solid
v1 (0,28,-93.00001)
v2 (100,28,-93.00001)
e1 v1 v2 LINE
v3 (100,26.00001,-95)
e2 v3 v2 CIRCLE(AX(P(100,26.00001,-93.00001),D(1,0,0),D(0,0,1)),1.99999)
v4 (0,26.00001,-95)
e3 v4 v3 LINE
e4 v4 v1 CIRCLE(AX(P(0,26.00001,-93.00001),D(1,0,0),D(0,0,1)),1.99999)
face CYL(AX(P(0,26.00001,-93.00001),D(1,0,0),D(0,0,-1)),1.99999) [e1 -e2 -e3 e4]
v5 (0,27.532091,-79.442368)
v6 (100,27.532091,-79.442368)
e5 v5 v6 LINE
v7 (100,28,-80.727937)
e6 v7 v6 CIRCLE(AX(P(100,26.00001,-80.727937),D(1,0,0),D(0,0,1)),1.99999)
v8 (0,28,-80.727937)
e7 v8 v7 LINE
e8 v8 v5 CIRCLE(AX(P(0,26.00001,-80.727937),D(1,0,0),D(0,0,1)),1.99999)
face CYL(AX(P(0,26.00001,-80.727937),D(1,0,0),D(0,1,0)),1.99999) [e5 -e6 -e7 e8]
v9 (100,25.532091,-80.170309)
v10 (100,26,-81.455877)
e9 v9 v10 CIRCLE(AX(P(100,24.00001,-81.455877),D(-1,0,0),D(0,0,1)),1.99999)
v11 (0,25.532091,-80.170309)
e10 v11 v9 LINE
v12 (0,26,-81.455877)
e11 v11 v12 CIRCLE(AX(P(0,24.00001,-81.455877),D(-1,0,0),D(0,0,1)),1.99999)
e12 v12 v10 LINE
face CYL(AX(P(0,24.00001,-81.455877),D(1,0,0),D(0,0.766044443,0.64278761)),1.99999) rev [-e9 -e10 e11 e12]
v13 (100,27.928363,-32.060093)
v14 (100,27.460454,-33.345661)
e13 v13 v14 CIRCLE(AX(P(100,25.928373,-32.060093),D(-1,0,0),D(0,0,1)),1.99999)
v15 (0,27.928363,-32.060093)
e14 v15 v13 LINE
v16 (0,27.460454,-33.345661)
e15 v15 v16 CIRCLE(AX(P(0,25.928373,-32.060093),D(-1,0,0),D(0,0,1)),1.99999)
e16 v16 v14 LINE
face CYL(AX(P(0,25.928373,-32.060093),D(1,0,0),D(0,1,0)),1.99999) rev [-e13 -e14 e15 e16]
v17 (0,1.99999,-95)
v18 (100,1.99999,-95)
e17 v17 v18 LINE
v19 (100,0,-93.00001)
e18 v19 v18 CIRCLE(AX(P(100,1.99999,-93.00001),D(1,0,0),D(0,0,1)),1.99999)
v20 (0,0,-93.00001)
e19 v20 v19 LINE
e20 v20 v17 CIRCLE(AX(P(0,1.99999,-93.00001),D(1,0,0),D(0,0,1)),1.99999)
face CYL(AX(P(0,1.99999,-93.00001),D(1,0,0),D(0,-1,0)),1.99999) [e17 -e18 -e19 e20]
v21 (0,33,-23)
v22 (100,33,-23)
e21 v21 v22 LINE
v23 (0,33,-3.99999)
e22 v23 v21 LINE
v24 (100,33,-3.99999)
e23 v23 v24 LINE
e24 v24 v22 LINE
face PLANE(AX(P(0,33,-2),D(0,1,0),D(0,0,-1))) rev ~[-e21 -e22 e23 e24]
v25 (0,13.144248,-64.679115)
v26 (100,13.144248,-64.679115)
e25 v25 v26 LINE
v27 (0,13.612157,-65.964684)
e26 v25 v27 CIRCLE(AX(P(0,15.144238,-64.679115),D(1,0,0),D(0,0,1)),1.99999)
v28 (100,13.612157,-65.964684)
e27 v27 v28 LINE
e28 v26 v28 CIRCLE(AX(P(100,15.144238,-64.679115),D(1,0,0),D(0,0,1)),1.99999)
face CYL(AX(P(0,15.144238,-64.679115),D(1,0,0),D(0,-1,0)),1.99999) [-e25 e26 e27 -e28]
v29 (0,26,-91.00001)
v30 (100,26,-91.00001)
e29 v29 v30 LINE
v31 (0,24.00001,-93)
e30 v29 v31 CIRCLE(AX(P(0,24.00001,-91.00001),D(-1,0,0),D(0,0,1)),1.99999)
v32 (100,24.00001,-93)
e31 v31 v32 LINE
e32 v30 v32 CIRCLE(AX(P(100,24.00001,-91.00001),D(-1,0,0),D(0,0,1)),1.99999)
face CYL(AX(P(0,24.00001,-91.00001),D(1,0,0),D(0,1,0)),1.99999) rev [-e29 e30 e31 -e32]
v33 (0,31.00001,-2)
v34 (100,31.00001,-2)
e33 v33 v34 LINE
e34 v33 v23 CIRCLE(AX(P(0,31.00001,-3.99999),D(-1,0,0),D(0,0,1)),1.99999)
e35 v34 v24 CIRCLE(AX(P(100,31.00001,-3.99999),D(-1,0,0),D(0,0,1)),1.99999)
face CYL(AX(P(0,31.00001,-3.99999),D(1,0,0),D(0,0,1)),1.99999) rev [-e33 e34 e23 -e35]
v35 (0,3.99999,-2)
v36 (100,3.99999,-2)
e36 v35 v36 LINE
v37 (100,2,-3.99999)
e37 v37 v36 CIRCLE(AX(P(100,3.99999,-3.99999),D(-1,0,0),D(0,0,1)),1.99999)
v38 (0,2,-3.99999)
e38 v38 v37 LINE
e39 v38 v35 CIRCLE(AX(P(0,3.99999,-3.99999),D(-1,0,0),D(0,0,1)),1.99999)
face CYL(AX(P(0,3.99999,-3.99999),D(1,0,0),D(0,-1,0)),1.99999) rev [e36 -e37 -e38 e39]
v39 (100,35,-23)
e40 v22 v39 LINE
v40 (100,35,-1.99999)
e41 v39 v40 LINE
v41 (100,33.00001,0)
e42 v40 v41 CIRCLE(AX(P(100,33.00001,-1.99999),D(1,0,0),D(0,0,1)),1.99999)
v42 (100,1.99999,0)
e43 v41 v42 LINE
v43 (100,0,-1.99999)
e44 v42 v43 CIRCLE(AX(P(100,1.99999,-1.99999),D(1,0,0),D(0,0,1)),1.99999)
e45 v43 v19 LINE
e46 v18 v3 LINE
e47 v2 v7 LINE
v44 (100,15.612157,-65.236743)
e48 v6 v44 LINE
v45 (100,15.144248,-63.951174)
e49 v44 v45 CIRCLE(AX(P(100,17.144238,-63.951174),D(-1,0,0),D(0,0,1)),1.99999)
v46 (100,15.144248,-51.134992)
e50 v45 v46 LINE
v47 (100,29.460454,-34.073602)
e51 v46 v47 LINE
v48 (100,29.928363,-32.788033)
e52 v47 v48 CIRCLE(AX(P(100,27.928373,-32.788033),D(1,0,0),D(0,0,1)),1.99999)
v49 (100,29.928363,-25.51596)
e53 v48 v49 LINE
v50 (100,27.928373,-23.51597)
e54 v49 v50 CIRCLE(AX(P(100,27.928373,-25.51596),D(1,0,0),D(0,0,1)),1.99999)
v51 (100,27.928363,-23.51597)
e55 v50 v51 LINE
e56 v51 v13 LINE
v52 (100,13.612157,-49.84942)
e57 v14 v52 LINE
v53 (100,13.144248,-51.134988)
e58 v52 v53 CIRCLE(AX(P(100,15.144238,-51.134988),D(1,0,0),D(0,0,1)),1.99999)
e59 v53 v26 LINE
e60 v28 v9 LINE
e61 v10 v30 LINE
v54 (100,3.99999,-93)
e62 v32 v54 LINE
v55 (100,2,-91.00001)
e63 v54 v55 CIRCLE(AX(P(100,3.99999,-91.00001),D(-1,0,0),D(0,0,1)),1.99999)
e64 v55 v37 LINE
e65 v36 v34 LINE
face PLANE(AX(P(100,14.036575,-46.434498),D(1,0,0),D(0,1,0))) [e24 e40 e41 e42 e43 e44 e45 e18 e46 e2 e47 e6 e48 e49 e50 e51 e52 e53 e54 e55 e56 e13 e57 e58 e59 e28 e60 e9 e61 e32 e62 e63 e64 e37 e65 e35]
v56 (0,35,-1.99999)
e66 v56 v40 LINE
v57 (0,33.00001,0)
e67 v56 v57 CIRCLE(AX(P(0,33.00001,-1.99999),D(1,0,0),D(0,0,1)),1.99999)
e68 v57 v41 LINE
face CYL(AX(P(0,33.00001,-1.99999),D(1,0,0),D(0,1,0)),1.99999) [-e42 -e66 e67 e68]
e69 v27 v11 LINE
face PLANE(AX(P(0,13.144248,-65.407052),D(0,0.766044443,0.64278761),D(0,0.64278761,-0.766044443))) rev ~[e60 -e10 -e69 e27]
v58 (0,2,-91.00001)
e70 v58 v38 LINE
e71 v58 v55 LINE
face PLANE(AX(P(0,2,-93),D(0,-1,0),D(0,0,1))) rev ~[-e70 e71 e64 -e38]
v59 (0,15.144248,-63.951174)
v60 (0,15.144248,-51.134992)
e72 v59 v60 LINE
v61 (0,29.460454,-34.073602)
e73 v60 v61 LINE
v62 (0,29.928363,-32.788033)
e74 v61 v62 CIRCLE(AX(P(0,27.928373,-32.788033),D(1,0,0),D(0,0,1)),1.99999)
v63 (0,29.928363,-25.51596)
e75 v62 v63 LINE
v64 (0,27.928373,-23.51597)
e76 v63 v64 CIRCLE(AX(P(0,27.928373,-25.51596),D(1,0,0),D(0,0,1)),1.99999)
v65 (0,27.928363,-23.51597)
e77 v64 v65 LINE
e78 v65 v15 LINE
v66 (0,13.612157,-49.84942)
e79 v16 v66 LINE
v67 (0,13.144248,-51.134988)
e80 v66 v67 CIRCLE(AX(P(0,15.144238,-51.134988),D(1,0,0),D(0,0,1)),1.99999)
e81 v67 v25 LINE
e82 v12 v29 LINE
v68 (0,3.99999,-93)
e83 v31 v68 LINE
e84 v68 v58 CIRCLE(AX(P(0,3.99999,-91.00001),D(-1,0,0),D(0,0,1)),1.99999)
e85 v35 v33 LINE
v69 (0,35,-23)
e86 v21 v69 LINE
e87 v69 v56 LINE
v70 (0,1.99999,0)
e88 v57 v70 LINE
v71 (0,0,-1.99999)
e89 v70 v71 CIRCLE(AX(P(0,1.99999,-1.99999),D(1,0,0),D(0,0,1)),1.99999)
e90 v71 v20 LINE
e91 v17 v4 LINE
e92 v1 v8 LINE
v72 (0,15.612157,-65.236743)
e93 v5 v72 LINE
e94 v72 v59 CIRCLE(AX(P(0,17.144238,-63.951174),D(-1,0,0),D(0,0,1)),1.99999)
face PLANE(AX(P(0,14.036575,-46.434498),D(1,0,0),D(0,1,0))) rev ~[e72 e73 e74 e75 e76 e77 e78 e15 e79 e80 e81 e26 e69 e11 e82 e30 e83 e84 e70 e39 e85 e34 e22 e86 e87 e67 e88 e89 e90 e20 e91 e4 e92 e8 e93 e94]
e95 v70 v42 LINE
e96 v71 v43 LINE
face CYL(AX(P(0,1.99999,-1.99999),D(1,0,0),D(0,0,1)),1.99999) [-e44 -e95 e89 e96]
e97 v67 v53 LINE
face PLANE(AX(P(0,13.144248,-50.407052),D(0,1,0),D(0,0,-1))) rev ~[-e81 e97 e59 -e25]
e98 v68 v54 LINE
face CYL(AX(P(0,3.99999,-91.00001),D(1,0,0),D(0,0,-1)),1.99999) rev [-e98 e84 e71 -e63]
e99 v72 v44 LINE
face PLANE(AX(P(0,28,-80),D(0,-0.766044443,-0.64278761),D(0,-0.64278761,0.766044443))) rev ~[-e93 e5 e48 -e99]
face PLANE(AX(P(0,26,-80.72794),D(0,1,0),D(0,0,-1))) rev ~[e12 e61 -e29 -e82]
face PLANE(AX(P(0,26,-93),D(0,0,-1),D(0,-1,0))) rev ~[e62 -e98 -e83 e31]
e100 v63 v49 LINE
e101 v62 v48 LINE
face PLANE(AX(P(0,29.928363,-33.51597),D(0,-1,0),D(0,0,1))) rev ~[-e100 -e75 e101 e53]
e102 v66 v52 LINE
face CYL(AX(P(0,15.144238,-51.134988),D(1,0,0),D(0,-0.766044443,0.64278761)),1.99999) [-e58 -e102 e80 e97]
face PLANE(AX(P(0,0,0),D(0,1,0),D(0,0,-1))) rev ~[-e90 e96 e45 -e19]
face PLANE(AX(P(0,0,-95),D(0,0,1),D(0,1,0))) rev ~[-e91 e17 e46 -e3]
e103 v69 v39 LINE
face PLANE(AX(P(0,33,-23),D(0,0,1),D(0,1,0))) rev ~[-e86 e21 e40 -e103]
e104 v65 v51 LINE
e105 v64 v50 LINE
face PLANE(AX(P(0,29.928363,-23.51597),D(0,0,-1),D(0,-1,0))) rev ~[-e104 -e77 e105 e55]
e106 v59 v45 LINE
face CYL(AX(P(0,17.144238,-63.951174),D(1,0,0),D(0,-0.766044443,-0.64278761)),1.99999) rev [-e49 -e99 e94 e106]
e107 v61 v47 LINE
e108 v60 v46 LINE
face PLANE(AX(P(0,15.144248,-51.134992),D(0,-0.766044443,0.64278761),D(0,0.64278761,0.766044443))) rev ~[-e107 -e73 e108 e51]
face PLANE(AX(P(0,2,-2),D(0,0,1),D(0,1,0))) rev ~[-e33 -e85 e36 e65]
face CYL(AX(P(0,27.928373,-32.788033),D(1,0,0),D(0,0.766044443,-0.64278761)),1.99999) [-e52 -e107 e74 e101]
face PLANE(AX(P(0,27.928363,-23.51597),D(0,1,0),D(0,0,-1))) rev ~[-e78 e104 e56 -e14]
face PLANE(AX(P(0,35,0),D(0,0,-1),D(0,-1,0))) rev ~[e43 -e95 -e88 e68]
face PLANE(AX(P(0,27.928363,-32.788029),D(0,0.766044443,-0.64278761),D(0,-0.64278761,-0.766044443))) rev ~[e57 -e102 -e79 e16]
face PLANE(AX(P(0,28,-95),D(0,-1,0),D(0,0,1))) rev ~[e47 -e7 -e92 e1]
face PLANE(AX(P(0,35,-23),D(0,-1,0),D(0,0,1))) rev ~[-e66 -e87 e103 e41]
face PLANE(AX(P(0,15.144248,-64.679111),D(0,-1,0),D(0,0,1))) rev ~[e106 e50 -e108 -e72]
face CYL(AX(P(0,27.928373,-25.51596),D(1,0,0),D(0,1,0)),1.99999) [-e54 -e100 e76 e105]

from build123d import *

# Parameters (mm, degrees)
F1_DEPTH = 100
F2_R     = 1.99999


# Not quite as in the source:
# - a fillet or chamfer is up to 0.001 mm smaller than in the source, because OpenCascade refuses the exact size


with BuildPart() as f1:
    # F0 (on Right) → F1 (new body)
    with BuildSketch(Plane.YZ):
        Polygon((33, -23), (35, -23), (35, 0), (0, 0), (0, -95), (28, -95), (28, -80), (15.1442478063, -64.6791111376), (15.1442478063, -51.1349920747), (29.9283628291, -33.5159698829), (29.9283628291, -23.5159698829), (27.9283628291, -23.5159698829), (27.9283628291, -32.7880294144), (13.1442478063, -50.4070516062), (13.1442478063, -65.4070516062), (26, -80.7279404685), (26, -93), (2, -93), (2, -2), (33, -2), align=None)
    extrude(amount=F1_DEPTH)

    # F2 (radius 2 in the source; OpenCascade refuses exactly that, so slightly less here)
    f2_edges = [f1.edges().sort_by_distance(p)[0] for p in [
        (50, 35, 0),
        (50, 0, 0),
        (50, 33, -2),
        (50, 2, -2),
        (50, 0, -95),
        (50, 28, -95),
        (50, 28, -80),
        (50, 2, -93),
        (50, 26, -93),
        (50, 26, -80.72794),
        (50, 27.928363, -32.788029),
        (50, 15.144248, -64.679111),
        (50, 29.928363, -33.51597),
        (50, 29.928363, -23.51597),
        (50, 13.144248, -50.407052),
        (50, 13.144248, -65.407052),
    ]]
    fillet(f2_edges, radius=F2_R)


solid = f1.part
